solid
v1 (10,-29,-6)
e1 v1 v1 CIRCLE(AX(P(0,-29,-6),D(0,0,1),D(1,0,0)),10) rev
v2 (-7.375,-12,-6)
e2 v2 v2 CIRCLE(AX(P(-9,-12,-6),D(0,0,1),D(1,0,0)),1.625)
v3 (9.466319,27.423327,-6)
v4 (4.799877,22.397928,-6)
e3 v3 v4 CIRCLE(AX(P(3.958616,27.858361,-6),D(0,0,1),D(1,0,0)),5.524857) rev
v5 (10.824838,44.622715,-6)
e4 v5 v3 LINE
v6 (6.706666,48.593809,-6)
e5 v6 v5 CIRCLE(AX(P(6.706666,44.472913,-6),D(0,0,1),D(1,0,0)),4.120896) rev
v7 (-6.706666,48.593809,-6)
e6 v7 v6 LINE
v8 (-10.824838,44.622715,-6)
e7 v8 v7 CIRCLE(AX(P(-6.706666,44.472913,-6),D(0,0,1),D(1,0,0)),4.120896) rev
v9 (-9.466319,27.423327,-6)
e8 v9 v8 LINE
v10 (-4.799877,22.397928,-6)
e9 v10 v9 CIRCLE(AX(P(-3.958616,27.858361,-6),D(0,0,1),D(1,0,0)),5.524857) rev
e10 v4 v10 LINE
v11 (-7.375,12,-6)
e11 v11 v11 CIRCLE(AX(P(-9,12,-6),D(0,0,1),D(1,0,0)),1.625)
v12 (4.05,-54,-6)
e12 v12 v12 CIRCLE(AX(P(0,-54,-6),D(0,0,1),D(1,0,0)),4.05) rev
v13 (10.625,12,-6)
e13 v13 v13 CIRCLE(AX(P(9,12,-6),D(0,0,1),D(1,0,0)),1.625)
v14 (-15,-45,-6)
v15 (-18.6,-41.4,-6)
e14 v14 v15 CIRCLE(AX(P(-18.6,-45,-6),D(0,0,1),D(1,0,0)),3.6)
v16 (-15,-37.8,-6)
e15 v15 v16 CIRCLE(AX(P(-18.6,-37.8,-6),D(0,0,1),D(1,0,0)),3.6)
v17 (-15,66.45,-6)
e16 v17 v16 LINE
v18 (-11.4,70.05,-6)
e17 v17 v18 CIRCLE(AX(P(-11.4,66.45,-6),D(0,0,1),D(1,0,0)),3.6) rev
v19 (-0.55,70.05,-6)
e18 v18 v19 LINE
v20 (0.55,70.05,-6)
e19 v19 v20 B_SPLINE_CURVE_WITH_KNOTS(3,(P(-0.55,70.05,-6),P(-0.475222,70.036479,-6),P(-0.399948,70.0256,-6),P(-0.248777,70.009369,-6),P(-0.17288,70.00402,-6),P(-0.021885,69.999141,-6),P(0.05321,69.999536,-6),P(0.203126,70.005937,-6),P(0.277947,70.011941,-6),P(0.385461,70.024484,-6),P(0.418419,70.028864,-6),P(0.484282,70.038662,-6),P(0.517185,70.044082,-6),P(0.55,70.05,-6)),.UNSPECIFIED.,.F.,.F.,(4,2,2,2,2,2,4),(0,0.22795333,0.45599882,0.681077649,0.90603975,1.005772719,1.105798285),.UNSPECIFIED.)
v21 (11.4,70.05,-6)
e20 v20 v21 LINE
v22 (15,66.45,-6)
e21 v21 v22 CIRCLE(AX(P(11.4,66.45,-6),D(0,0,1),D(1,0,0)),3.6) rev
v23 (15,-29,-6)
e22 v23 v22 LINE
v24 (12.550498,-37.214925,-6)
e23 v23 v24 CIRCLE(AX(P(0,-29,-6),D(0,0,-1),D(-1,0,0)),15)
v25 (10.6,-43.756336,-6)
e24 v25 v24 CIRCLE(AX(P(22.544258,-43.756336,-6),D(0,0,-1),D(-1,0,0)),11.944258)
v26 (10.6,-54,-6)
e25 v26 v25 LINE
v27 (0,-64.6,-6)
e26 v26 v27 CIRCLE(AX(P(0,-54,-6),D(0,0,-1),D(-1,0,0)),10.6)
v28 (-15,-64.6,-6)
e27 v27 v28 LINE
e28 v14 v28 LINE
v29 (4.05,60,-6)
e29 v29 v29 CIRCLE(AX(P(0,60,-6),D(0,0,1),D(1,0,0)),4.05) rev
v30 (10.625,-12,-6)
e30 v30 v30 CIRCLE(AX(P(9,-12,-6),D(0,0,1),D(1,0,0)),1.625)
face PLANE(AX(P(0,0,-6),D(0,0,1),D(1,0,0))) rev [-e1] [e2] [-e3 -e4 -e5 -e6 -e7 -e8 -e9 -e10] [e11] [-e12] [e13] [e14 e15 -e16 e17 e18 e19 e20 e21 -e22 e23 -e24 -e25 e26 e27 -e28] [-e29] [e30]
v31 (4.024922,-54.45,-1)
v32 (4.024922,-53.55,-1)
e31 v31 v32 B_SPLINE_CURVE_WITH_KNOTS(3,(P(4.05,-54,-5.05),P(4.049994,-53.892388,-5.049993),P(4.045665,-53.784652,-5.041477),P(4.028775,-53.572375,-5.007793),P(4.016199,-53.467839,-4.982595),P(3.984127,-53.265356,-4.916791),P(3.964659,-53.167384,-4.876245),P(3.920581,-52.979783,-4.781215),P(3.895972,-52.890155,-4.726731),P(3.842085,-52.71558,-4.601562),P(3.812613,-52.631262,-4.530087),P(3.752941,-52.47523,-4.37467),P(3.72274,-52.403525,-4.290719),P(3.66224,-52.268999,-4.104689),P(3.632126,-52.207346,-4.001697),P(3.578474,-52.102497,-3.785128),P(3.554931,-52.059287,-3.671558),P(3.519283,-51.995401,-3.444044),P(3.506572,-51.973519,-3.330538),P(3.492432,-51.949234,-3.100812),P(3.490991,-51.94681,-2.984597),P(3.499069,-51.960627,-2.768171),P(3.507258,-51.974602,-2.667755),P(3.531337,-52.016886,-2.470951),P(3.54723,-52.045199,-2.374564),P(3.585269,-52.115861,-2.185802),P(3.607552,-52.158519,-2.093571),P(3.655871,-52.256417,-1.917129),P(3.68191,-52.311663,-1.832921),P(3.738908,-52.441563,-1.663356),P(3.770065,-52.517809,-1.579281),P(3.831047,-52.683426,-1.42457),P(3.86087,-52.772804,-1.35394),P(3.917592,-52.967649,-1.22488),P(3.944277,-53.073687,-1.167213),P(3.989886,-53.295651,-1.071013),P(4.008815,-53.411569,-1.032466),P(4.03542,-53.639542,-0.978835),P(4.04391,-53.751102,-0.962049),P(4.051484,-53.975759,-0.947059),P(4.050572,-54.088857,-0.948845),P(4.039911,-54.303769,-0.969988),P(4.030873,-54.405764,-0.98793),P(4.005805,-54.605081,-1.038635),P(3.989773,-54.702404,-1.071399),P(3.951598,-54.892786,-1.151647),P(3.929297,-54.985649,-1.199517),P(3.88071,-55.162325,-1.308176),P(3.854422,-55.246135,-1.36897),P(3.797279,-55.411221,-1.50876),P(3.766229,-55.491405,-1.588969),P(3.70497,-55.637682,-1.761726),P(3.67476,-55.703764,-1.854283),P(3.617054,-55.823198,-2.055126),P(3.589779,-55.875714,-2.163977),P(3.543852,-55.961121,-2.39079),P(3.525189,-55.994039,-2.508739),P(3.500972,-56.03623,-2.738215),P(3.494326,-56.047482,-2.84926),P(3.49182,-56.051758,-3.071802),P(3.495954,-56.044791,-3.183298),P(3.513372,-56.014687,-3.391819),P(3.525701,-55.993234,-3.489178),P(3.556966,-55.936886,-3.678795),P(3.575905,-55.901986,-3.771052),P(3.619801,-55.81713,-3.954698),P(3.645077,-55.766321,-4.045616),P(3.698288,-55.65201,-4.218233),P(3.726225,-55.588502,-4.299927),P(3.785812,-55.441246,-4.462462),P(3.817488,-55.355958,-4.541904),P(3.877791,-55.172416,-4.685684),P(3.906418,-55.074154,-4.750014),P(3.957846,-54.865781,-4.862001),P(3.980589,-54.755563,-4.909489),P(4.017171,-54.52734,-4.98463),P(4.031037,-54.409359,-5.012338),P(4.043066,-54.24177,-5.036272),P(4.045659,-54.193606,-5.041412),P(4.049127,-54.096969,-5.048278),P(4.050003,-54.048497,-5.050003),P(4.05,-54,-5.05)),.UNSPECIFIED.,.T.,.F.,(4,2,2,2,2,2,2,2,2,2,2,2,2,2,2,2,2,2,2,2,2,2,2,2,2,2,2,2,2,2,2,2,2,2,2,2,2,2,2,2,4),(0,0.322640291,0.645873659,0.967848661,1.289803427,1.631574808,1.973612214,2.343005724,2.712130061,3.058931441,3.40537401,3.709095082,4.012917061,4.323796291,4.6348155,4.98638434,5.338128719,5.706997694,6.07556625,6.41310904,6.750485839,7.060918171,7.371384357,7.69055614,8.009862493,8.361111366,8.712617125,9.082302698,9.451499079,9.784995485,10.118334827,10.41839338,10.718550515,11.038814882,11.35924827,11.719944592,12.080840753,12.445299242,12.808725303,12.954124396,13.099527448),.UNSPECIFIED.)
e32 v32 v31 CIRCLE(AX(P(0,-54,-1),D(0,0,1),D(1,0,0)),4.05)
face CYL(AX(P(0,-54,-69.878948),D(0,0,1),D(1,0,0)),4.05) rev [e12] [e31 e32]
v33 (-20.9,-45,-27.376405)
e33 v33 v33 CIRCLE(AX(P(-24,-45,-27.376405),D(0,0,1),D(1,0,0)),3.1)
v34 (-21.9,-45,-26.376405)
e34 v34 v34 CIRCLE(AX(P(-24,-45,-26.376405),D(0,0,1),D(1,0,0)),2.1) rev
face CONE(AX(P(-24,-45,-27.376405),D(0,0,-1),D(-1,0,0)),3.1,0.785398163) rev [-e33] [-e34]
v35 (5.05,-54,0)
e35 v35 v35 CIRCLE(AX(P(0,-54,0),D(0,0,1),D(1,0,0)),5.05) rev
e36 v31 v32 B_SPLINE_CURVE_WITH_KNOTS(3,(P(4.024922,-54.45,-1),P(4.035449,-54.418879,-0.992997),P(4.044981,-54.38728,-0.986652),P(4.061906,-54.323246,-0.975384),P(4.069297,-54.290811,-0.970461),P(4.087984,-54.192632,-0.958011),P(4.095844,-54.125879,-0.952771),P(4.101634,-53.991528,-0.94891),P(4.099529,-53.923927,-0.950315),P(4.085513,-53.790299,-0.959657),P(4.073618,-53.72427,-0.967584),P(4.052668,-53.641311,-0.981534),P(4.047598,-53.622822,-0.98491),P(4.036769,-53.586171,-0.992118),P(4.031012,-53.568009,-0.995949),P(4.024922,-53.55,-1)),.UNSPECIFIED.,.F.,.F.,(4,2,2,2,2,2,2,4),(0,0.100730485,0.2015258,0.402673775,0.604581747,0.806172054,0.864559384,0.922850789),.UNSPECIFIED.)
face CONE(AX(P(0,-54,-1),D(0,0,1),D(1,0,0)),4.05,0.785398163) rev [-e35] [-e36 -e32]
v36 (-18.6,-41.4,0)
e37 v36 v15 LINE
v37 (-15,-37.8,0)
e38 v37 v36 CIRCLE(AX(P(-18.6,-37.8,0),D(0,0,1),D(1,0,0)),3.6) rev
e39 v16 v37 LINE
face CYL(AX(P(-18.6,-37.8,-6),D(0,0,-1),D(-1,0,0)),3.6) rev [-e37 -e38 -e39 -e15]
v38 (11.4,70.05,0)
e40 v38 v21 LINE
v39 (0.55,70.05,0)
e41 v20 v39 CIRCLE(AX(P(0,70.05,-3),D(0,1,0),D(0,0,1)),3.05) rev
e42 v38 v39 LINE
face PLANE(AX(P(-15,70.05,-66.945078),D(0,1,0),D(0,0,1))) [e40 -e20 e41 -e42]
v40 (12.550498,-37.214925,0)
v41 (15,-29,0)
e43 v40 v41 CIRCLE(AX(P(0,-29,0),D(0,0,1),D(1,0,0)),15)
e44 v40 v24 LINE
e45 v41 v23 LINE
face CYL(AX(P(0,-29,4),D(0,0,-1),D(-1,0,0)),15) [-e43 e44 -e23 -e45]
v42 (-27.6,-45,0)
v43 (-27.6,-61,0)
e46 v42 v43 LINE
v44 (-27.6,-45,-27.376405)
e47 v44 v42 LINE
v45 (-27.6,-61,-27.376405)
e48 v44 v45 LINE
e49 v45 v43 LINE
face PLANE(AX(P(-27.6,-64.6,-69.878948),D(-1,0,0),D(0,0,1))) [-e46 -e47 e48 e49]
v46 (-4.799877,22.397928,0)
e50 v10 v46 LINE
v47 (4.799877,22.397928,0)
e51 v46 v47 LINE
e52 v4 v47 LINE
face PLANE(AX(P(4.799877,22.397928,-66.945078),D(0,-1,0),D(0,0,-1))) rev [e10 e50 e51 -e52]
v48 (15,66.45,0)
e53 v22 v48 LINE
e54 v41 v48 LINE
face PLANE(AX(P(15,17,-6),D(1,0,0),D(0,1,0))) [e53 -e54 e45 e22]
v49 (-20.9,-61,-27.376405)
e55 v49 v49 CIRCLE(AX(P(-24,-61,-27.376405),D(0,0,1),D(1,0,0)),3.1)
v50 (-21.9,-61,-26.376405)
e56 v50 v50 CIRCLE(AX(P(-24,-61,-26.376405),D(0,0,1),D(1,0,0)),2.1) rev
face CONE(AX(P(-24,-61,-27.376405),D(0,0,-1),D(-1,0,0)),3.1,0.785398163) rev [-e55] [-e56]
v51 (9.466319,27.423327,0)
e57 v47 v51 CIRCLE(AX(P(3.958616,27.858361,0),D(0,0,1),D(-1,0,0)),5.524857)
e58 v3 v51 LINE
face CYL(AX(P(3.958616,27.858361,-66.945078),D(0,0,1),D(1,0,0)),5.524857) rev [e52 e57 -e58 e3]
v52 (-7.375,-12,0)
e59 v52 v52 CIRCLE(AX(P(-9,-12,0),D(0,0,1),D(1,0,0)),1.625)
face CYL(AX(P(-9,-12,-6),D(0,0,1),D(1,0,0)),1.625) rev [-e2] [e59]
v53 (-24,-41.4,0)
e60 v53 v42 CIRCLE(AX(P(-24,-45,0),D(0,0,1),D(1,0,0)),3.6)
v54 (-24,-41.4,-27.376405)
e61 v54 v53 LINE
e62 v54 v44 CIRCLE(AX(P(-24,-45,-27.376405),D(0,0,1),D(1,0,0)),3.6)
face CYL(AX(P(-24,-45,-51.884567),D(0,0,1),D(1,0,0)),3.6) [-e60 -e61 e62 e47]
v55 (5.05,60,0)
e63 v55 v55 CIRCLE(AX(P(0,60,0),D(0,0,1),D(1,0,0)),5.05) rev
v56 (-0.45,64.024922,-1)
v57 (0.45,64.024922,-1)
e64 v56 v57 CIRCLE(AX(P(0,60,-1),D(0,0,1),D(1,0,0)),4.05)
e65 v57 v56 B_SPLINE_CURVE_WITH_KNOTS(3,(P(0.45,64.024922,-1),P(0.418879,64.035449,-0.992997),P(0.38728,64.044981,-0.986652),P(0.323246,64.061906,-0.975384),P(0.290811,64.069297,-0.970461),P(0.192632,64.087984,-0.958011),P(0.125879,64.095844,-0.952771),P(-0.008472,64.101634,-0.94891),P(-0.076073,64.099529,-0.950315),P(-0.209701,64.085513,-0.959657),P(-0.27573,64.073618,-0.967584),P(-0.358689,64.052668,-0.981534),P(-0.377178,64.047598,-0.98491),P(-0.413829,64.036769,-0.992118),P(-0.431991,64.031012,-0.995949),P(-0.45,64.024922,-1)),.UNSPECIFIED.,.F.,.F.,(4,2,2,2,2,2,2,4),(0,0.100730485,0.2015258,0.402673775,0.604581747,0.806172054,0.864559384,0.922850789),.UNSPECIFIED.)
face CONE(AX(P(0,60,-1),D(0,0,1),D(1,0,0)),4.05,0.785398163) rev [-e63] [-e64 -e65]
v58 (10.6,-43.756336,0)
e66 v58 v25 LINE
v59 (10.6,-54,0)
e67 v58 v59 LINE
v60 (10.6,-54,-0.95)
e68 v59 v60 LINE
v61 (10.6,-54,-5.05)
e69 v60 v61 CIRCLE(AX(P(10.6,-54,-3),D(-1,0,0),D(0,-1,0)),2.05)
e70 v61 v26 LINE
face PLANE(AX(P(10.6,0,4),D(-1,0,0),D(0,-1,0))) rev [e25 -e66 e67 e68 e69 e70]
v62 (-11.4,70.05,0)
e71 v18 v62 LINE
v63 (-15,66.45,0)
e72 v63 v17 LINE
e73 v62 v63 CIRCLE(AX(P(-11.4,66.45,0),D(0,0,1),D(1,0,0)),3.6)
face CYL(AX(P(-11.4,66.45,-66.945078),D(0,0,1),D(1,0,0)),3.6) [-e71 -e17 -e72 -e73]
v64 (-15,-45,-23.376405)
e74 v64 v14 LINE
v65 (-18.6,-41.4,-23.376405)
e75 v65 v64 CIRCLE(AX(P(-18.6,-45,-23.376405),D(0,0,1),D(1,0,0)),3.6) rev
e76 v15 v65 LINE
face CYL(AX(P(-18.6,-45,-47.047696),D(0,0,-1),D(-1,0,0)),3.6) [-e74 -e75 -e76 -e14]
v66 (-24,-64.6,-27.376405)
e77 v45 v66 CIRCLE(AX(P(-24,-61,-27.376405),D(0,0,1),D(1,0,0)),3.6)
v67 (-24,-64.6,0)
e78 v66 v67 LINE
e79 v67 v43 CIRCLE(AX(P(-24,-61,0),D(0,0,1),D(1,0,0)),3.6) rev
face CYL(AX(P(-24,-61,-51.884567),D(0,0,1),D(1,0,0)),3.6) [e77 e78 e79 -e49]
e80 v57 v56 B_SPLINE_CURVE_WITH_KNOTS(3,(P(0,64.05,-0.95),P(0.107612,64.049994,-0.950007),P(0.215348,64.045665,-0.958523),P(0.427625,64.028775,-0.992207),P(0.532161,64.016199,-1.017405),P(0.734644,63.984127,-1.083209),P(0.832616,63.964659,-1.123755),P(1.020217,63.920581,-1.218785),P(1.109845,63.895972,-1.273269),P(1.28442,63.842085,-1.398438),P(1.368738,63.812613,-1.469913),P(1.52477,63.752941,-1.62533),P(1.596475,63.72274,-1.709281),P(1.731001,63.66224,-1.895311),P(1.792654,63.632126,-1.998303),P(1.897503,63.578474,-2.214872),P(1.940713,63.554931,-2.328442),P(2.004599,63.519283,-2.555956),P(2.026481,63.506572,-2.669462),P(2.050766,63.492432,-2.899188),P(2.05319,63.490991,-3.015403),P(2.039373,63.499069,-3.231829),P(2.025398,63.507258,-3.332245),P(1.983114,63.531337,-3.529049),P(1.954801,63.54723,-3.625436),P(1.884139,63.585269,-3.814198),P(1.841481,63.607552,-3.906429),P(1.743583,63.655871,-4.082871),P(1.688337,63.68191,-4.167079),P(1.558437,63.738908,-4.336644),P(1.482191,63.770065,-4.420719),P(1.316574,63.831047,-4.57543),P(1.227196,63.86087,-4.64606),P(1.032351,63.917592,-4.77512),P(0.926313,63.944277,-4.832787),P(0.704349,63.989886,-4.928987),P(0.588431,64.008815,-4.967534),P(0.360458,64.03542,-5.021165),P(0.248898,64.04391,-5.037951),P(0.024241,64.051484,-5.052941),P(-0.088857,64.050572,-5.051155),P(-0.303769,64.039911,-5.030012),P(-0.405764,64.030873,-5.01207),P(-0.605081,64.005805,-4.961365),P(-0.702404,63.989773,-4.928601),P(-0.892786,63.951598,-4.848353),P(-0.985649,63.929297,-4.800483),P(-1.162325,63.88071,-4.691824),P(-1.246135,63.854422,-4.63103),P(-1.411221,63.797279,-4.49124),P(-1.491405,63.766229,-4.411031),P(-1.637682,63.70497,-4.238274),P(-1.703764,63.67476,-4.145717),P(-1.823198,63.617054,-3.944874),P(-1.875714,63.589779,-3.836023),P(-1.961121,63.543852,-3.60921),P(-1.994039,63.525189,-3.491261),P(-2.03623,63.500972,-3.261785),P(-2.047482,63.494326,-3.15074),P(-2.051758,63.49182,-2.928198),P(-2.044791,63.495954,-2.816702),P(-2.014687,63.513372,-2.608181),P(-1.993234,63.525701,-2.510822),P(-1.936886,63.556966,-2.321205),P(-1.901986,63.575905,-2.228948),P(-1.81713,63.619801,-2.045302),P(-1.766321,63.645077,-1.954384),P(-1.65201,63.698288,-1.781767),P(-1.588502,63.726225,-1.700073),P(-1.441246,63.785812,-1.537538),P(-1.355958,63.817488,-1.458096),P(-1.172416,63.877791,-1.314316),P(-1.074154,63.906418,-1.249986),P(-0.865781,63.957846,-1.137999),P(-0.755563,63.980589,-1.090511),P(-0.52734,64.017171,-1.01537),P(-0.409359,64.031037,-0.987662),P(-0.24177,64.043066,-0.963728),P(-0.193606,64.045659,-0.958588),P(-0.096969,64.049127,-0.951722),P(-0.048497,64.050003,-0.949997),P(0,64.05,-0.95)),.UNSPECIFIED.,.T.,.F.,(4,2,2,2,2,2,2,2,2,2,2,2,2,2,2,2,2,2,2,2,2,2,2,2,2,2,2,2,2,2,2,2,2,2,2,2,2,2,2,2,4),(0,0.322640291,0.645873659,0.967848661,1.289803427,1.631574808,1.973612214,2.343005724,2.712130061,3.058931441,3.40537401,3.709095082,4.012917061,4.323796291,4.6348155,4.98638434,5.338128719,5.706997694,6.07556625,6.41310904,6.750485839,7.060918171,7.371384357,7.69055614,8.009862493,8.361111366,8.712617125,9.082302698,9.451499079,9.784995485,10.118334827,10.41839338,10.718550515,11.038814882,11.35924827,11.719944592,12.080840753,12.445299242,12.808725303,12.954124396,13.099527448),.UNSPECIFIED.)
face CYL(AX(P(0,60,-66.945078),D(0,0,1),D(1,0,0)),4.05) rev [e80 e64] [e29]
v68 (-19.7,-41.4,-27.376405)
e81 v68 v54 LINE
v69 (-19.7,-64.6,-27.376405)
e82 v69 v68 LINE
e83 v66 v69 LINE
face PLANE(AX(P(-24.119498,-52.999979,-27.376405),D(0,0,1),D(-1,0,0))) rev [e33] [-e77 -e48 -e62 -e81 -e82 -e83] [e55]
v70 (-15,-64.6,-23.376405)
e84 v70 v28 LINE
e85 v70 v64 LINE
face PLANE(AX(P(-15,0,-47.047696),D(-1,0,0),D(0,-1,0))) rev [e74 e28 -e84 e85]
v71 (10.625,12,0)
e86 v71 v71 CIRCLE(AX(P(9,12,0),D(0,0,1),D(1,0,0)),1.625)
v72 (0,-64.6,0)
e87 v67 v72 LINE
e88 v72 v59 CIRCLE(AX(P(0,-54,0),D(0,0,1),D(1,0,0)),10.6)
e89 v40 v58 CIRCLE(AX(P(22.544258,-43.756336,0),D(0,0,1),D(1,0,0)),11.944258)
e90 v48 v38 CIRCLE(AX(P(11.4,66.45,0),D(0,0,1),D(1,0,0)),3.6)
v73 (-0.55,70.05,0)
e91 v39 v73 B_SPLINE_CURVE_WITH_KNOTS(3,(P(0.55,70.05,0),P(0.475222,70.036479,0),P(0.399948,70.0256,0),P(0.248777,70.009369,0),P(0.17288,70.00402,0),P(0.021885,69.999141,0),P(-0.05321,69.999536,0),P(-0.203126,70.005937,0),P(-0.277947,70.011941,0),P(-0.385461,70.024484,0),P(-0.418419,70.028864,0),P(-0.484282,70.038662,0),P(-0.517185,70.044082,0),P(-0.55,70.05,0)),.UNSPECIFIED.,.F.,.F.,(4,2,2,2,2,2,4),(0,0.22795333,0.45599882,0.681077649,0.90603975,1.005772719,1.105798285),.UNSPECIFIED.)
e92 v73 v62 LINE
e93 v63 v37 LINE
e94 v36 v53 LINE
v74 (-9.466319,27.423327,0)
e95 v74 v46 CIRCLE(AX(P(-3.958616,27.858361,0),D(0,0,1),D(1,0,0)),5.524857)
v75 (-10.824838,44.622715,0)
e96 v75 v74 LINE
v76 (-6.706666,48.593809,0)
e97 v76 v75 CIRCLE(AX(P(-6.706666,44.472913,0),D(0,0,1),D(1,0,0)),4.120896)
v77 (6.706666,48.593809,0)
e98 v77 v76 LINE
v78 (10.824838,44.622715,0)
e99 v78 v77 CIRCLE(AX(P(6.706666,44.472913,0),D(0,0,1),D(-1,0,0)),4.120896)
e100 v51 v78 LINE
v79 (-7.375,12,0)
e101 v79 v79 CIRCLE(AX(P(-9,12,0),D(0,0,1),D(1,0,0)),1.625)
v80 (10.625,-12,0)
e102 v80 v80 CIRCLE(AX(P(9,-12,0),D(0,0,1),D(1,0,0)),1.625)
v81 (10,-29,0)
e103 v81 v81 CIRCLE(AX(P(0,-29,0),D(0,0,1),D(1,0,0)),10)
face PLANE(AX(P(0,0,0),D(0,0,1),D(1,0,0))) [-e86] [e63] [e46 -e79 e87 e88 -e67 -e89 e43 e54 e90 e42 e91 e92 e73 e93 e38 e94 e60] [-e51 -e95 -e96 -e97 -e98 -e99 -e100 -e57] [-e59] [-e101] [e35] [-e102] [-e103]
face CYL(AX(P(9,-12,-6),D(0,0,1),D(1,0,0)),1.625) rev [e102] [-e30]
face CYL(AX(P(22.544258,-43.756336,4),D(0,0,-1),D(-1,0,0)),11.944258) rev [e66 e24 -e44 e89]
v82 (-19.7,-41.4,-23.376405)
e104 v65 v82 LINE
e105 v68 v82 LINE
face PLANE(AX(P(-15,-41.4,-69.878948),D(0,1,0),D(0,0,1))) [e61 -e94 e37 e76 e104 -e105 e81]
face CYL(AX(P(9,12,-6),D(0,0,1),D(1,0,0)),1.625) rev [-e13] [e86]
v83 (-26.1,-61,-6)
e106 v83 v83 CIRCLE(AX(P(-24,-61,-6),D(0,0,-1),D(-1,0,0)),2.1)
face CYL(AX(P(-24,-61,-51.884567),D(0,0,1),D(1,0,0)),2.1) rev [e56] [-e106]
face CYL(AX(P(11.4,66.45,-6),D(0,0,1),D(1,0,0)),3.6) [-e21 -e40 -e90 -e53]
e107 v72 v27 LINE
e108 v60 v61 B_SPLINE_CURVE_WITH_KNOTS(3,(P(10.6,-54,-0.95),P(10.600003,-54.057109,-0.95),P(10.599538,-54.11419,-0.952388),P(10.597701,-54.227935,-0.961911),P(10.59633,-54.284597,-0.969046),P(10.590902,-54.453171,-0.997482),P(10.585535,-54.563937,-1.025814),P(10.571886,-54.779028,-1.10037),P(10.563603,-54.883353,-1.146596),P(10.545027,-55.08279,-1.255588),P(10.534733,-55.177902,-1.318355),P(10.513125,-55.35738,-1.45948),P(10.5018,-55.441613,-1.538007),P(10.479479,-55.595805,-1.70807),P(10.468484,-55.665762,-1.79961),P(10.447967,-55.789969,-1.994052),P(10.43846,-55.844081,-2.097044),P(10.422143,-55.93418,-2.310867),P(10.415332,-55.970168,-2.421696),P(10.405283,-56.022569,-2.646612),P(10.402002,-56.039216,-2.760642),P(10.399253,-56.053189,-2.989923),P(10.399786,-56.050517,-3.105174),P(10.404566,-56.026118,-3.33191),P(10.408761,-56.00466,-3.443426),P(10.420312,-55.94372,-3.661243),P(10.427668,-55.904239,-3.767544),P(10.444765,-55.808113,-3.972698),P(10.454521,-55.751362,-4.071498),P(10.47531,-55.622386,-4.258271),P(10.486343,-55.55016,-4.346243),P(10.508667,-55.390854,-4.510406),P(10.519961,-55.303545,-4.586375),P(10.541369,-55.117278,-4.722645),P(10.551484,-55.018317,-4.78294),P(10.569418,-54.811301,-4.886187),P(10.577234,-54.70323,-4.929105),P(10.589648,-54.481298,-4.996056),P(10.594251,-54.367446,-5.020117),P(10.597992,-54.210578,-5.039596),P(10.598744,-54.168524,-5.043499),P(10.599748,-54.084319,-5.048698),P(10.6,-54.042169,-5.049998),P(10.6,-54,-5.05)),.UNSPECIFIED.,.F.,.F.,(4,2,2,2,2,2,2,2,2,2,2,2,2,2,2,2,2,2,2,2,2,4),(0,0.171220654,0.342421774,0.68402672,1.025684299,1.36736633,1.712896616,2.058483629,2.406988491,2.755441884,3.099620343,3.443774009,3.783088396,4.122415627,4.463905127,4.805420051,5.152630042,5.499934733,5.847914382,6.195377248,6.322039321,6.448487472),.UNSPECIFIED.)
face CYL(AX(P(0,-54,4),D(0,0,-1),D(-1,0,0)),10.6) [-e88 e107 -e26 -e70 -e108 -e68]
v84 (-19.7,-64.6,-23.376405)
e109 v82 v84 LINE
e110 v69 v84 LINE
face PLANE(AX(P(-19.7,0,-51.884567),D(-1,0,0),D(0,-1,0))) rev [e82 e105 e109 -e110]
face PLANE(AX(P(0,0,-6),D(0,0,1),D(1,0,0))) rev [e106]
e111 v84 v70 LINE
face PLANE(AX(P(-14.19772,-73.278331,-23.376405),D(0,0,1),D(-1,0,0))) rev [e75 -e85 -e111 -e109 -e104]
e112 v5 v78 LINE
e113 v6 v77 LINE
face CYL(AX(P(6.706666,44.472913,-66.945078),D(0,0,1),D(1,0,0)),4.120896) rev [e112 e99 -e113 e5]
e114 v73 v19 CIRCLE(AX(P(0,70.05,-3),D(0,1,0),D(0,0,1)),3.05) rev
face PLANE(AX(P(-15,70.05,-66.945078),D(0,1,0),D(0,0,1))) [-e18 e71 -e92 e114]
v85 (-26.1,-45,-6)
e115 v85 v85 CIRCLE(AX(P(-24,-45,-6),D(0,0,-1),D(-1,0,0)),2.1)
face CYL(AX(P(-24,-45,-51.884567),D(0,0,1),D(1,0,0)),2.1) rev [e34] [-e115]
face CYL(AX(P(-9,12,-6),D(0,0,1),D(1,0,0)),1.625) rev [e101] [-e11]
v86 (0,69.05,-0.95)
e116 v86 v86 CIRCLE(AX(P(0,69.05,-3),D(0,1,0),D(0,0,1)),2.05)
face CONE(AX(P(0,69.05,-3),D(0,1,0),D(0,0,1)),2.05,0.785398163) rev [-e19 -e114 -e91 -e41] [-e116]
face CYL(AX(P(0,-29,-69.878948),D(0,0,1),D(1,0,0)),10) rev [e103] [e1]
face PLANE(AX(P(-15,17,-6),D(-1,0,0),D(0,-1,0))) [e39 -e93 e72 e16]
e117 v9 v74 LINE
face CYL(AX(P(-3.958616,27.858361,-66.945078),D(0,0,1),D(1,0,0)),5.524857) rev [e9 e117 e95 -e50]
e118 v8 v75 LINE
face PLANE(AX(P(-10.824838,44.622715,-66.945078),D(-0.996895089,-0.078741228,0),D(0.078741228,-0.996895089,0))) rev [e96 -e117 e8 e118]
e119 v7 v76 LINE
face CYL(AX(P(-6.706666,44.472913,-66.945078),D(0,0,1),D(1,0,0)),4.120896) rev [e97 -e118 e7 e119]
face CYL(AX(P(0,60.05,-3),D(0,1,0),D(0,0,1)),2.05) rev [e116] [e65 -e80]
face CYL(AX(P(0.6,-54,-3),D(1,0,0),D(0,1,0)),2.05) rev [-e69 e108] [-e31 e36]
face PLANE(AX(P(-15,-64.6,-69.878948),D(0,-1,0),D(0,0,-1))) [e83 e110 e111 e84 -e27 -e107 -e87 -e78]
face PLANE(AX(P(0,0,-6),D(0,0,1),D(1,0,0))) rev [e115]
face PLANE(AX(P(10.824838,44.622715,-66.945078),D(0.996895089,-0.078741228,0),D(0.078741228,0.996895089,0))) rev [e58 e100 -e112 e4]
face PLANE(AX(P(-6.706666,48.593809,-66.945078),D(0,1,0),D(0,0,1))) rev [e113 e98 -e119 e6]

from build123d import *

# Parameters (mm, degrees)
SKETCH1_W           = 30
SKETCH1_H           = 34
SKETCH1_R           = 1.625
BOSS_EXTRUDE1_DEPTH = 6
BOSS_EXTRUDE3_START = -6
SKETCH2_R           = 10
SKETCH2_R_2         = 4.05
BOSS_EXTRUDE3_DEPTH = 6
SKETCH3_R           = 2.1
BOSS_EXTRUDE4_DEPTH = 21.376405408
CUT_EXTRUDE1_START  = -10
CUT_EXTRUDE1_DEPTH  = 10
SKETCH5_W           = 4.7
SKETCH5_H           = 23.2
BOSS_EXTRUDE5_DEPTH = 17.376405408
CUT_EXTRUDE2_DEPTH  = 10
SKETCH8_R           = 2.05
CUT_EXTRUDE3_DEPTH  = 10
SKETCH9_W           = 30
SKETCH9_H           = 53.05
SKETCH9_R           = 4.05
BOSS_EXTRUDE6_DEPTH = 6
SKETCH10_R          = 2.05
CUT_EXTRUDE7_DEPTH  = 10
FILLET2_R           = 3.6
FILLET3_R           = 3.6
CHAMFER1_SIZE       = 1
CHAMFER2_SIZE       = 1


with BuildPart() as part:
    # Sketch1 → Boss-Extrude1 (new body)
    with BuildSketch(Plane.XY):
        Rectangle(SKETCH1_W, SKETCH1_H)
        with Locations((-9, 12)):
            Circle(SKETCH1_R, mode=Mode.SUBTRACT)
        with Locations((9, 12)):
            Circle(SKETCH1_R, mode=Mode.SUBTRACT)
        with Locations((-9, -12)):
            Circle(SKETCH1_R, mode=Mode.SUBTRACT)
        with Locations((9, -12)):
            Circle(SKETCH1_R, mode=Mode.SUBTRACT)
    extrude(amount=-BOSS_EXTRUDE1_DEPTH)

    # Sketch2 → Boss-Extrude3 (add)
    with BuildSketch(Plane.XY.offset(BOSS_EXTRUDE3_START)):
        Polygon((-15, -17), (15, -17), (15, -64.6), (-15, -64.6), (-27.6, -64.6), (-27.6, -41.4), (-15, -41.4), align=None)
        with Locations((0, -29)):
            Circle(SKETCH2_R, mode=Mode.SUBTRACT)
        with Locations((0, -54)):
            Circle(SKETCH2_R_2, mode=Mode.SUBTRACT)
    extrude(amount=BOSS_EXTRUDE3_DEPTH)

    # Sketch3 → Boss-Extrude4 (add)
    with BuildSketch(Plane(origin=(0, 0, -6), x_dir=(-1, 0, 0), z_dir=(0, 0, -1))):
        with BuildLine():
            Line((27.6, -61), (27.6, -45))
            ThreePointArc((27.6, -45), (26.545584412, -42.454415588), (24, -41.4))
            Line((24, -41.4), (19.7, -41.4))
            Line((19.7, -41.4), (19.7, -64.6))
            Line((19.7, -64.6), (24, -64.6))
            ThreePointArc((24, -64.6), (26.545584412, -63.545584412), (27.6, -61))
        make_face()
        with Locations(Location((24, -61, 0), (0, 0, 180))):
            Circle(SKETCH3_R, mode=Mode.SUBTRACT)
        with Locations(Location((24, -45, 0), (0, 0, 180))):
            Circle(SKETCH3_R, mode=Mode.SUBTRACT)
    extrude(amount=BOSS_EXTRUDE4_DEPTH)

    # Sketch4 → Cut-Extrude1 (cut)
    with BuildSketch(Plane(origin=(0, 0, -6), x_dir=(-1, 0, 0), z_dir=(0, 0, -1)).offset(CUT_EXTRUDE1_START)):
        with BuildLine():
            ThreePointArc((27.6, -61), (26.545584412, -63.545584412), (24, -64.6))
            Line((24, -64.6), (27.6, -64.6))
            Line((27.6, -64.6), (27.6, -61))
        make_face()
        with BuildLine():
            ThreePointArc((24, -41.4), (26.545584412, -42.454415588), (27.6, -45))
            Line((27.6, -45), (27.6, -41.4))
            Line((27.6, -41.4), (24, -41.4))
        make_face()
    extrude(amount=CUT_EXTRUDE1_DEPTH, mode=Mode.SUBTRACT)

    # Sketch5 → Boss-Extrude5 (add)
    with BuildSketch(Plane(origin=(0, 0, -6), x_dir=(-1, 0, 0), z_dir=(0, 0, -1))):
        with Locations((17.35, -53)):
            Rectangle(SKETCH5_W, SKETCH5_H)
    extrude(amount=BOSS_EXTRUDE5_DEPTH)

    # Sketch7 → Cut-Extrude2 (cut)
    with BuildSketch(Plane(origin=(0, 0, -6), x_dir=(-1, 0, 0), z_dir=(0, 0, -1))):
        with BuildLine():
            ThreePointArc((0, -64.6), (-7.495331881, -61.495331881), (-10.6, -54))
            Line((-10.6, -54), (-10.6, -43.756336497))
            ThreePointArc((-10.6, -43.756336497), (-11.098006621, -40.343327835), (-12.550498477, -37.214924709))
            ThreePointArc((-12.550498477, -37.214924709), (-14.374586553, -33.286170951), (-15, -29))
            Line((-15, -29), (-15, -64.6))
            Line((-15, -64.6), (0, -64.6))
        make_face()
    extrude(amount=-CUT_EXTRUDE2_DEPTH, mode=Mode.SUBTRACT)

    # Sketch8 → Cut-Extrude3 (cut)
    with BuildSketch(Plane(origin=(10.6, 0, 0), x_dir=(0, 0, -1), z_dir=(1, 0, 0))):
        with Locations((3, -54)):
            Circle(SKETCH8_R)
    extrude(amount=-CUT_EXTRUDE3_DEPTH, mode=Mode.SUBTRACT)

    # Sketch9 → Boss-Extrude6 (add)
    with BuildSketch(Plane.XY):
        with Locations((0, 43.525)):
            Rectangle(SKETCH9_W, SKETCH9_H)
        with Locations((0, 60)):
            Circle(SKETCH9_R, mode=Mode.SUBTRACT)
        with BuildLine():
            Line((-6.706665949, 48.593809049), (6.706665949, 48.593809049))
            ThreePointArc((6.706665949, 48.593809049), (9.567126212, 47.439316621), (10.824837954, 44.622714616))
            Line((10.824837954, 44.622714616), (9.466318981, 27.423327073))
            ThreePointArc((9.466318981, 27.423327073), (8.007195381, 24.098965988), (4.799877304, 22.397928344))
            Line((4.799877304, 22.397928344), (-4.799877304, 22.397928344))
            ThreePointArc((-4.799877304, 22.397928344), (-8.007195381, 24.098965988), (-9.466318981, 27.423327073))
            Line((-9.466318981, 27.423327073), (-10.824837954, 44.622714616))
            ThreePointArc((-10.824837954, 44.622714616), (-9.567126212, 47.439316621), (-6.706665949, 48.593809049))
        make_face(mode=Mode.SUBTRACT)
    extrude(amount=-BOSS_EXTRUDE6_DEPTH)

    # Sketch10 → Cut-Extrude7 (cut)
    with BuildSketch(Plane(origin=(0, 70.05, 0), x_dir=(1, 0, 0), z_dir=(0, 1, 0))):
        with Locations(Location((0, 3, 0), (0, 0, 270))):
            Circle(SKETCH10_R)
    extrude(amount=-CUT_EXTRUDE7_DEPTH, mode=Mode.SUBTRACT)

    # Fillet2
    fillet2_edges = [part.edges().sort_by_distance(p)[0] for p in [
        (15, 70.05, -3),
        (-15, 70.05, -3),
        (-15, -41.4, -3),
    ]]
    fillet(fillet2_edges, radius=FILLET2_R)

    # Fillet3
    fillet3_edges = [part.edges().sort_by_distance(p)[0] for p in [
        (-15, -41.4, -14.688202704),
    ]]
    fillet(fillet3_edges, radius=FILLET3_R)

    # Chamfer1
    # the kernel refuses this chamfer: 1 mm, written as the material it takes off along each edge
    with BuildSketch(Plane(origin=(0, 70.05, -3), x_dir=(0, 0, 1), z_dir=(-1, 0, 0))) as chamfer1_piece_1:
        Polygon((2.05 + CHAMFER1_SIZE, 0), (2.05, -CHAMFER1_SIZE), (2.05, 0), align=None)
    revolve(axis=Axis((0, 70.05, -3), (0, 1, 0)), mode=Mode.SUBTRACT)
    with BuildSketch(Plane(origin=(-24, -45, -27.376405408), x_dir=(1, 0, 0), z_dir=(0, 1, 0))) as chamfer1_piece_2:
        Polygon((2.1 + CHAMFER1_SIZE, 0), (2.1, -CHAMFER1_SIZE), (2.1, 0), align=None)
    revolve(axis=Axis((-24, -45, -27.376405408), (0, 0, -1)), mode=Mode.SUBTRACT)
    with BuildSketch(Plane(origin=(-24, -61, -27.376405408), x_dir=(1, 0, 0), z_dir=(0, 1, 0))) as chamfer1_piece_3:
        Polygon((2.1 + CHAMFER1_SIZE, 0), (2.1, -CHAMFER1_SIZE), (2.1, 0), align=None)
    revolve(axis=Axis((-24, -61, -27.376405408), (0, 0, -1)), mode=Mode.SUBTRACT)

    # Chamfer2
    # the kernel refuses this chamfer: 1 mm, written as the material it takes off along each edge
    with BuildSketch(Plane(origin=(0, -54, 0), x_dir=(1, 0, 0), z_dir=(0, -1, 0))) as chamfer2_piece_1:
        Polygon((4.05, -CHAMFER2_SIZE), (4.05 + CHAMFER2_SIZE, 0), (4.05, 0), align=None)
    revolve(axis=Axis((0, -54, 0), (0, 0, 1)), mode=Mode.SUBTRACT)
    with BuildSketch(Plane(origin=(0, 60, 0), x_dir=(1, 0, 0), z_dir=(0, -1, 0))) as chamfer2_piece_2:
        Polygon((4.05, -CHAMFER2_SIZE), (4.05 + CHAMFER2_SIZE, 0), (4.05, 0), align=None)
    revolve(axis=Axis((0, 60, 0), (0, 0, 1)), mode=Mode.SUBTRACT)


solid = part.part
